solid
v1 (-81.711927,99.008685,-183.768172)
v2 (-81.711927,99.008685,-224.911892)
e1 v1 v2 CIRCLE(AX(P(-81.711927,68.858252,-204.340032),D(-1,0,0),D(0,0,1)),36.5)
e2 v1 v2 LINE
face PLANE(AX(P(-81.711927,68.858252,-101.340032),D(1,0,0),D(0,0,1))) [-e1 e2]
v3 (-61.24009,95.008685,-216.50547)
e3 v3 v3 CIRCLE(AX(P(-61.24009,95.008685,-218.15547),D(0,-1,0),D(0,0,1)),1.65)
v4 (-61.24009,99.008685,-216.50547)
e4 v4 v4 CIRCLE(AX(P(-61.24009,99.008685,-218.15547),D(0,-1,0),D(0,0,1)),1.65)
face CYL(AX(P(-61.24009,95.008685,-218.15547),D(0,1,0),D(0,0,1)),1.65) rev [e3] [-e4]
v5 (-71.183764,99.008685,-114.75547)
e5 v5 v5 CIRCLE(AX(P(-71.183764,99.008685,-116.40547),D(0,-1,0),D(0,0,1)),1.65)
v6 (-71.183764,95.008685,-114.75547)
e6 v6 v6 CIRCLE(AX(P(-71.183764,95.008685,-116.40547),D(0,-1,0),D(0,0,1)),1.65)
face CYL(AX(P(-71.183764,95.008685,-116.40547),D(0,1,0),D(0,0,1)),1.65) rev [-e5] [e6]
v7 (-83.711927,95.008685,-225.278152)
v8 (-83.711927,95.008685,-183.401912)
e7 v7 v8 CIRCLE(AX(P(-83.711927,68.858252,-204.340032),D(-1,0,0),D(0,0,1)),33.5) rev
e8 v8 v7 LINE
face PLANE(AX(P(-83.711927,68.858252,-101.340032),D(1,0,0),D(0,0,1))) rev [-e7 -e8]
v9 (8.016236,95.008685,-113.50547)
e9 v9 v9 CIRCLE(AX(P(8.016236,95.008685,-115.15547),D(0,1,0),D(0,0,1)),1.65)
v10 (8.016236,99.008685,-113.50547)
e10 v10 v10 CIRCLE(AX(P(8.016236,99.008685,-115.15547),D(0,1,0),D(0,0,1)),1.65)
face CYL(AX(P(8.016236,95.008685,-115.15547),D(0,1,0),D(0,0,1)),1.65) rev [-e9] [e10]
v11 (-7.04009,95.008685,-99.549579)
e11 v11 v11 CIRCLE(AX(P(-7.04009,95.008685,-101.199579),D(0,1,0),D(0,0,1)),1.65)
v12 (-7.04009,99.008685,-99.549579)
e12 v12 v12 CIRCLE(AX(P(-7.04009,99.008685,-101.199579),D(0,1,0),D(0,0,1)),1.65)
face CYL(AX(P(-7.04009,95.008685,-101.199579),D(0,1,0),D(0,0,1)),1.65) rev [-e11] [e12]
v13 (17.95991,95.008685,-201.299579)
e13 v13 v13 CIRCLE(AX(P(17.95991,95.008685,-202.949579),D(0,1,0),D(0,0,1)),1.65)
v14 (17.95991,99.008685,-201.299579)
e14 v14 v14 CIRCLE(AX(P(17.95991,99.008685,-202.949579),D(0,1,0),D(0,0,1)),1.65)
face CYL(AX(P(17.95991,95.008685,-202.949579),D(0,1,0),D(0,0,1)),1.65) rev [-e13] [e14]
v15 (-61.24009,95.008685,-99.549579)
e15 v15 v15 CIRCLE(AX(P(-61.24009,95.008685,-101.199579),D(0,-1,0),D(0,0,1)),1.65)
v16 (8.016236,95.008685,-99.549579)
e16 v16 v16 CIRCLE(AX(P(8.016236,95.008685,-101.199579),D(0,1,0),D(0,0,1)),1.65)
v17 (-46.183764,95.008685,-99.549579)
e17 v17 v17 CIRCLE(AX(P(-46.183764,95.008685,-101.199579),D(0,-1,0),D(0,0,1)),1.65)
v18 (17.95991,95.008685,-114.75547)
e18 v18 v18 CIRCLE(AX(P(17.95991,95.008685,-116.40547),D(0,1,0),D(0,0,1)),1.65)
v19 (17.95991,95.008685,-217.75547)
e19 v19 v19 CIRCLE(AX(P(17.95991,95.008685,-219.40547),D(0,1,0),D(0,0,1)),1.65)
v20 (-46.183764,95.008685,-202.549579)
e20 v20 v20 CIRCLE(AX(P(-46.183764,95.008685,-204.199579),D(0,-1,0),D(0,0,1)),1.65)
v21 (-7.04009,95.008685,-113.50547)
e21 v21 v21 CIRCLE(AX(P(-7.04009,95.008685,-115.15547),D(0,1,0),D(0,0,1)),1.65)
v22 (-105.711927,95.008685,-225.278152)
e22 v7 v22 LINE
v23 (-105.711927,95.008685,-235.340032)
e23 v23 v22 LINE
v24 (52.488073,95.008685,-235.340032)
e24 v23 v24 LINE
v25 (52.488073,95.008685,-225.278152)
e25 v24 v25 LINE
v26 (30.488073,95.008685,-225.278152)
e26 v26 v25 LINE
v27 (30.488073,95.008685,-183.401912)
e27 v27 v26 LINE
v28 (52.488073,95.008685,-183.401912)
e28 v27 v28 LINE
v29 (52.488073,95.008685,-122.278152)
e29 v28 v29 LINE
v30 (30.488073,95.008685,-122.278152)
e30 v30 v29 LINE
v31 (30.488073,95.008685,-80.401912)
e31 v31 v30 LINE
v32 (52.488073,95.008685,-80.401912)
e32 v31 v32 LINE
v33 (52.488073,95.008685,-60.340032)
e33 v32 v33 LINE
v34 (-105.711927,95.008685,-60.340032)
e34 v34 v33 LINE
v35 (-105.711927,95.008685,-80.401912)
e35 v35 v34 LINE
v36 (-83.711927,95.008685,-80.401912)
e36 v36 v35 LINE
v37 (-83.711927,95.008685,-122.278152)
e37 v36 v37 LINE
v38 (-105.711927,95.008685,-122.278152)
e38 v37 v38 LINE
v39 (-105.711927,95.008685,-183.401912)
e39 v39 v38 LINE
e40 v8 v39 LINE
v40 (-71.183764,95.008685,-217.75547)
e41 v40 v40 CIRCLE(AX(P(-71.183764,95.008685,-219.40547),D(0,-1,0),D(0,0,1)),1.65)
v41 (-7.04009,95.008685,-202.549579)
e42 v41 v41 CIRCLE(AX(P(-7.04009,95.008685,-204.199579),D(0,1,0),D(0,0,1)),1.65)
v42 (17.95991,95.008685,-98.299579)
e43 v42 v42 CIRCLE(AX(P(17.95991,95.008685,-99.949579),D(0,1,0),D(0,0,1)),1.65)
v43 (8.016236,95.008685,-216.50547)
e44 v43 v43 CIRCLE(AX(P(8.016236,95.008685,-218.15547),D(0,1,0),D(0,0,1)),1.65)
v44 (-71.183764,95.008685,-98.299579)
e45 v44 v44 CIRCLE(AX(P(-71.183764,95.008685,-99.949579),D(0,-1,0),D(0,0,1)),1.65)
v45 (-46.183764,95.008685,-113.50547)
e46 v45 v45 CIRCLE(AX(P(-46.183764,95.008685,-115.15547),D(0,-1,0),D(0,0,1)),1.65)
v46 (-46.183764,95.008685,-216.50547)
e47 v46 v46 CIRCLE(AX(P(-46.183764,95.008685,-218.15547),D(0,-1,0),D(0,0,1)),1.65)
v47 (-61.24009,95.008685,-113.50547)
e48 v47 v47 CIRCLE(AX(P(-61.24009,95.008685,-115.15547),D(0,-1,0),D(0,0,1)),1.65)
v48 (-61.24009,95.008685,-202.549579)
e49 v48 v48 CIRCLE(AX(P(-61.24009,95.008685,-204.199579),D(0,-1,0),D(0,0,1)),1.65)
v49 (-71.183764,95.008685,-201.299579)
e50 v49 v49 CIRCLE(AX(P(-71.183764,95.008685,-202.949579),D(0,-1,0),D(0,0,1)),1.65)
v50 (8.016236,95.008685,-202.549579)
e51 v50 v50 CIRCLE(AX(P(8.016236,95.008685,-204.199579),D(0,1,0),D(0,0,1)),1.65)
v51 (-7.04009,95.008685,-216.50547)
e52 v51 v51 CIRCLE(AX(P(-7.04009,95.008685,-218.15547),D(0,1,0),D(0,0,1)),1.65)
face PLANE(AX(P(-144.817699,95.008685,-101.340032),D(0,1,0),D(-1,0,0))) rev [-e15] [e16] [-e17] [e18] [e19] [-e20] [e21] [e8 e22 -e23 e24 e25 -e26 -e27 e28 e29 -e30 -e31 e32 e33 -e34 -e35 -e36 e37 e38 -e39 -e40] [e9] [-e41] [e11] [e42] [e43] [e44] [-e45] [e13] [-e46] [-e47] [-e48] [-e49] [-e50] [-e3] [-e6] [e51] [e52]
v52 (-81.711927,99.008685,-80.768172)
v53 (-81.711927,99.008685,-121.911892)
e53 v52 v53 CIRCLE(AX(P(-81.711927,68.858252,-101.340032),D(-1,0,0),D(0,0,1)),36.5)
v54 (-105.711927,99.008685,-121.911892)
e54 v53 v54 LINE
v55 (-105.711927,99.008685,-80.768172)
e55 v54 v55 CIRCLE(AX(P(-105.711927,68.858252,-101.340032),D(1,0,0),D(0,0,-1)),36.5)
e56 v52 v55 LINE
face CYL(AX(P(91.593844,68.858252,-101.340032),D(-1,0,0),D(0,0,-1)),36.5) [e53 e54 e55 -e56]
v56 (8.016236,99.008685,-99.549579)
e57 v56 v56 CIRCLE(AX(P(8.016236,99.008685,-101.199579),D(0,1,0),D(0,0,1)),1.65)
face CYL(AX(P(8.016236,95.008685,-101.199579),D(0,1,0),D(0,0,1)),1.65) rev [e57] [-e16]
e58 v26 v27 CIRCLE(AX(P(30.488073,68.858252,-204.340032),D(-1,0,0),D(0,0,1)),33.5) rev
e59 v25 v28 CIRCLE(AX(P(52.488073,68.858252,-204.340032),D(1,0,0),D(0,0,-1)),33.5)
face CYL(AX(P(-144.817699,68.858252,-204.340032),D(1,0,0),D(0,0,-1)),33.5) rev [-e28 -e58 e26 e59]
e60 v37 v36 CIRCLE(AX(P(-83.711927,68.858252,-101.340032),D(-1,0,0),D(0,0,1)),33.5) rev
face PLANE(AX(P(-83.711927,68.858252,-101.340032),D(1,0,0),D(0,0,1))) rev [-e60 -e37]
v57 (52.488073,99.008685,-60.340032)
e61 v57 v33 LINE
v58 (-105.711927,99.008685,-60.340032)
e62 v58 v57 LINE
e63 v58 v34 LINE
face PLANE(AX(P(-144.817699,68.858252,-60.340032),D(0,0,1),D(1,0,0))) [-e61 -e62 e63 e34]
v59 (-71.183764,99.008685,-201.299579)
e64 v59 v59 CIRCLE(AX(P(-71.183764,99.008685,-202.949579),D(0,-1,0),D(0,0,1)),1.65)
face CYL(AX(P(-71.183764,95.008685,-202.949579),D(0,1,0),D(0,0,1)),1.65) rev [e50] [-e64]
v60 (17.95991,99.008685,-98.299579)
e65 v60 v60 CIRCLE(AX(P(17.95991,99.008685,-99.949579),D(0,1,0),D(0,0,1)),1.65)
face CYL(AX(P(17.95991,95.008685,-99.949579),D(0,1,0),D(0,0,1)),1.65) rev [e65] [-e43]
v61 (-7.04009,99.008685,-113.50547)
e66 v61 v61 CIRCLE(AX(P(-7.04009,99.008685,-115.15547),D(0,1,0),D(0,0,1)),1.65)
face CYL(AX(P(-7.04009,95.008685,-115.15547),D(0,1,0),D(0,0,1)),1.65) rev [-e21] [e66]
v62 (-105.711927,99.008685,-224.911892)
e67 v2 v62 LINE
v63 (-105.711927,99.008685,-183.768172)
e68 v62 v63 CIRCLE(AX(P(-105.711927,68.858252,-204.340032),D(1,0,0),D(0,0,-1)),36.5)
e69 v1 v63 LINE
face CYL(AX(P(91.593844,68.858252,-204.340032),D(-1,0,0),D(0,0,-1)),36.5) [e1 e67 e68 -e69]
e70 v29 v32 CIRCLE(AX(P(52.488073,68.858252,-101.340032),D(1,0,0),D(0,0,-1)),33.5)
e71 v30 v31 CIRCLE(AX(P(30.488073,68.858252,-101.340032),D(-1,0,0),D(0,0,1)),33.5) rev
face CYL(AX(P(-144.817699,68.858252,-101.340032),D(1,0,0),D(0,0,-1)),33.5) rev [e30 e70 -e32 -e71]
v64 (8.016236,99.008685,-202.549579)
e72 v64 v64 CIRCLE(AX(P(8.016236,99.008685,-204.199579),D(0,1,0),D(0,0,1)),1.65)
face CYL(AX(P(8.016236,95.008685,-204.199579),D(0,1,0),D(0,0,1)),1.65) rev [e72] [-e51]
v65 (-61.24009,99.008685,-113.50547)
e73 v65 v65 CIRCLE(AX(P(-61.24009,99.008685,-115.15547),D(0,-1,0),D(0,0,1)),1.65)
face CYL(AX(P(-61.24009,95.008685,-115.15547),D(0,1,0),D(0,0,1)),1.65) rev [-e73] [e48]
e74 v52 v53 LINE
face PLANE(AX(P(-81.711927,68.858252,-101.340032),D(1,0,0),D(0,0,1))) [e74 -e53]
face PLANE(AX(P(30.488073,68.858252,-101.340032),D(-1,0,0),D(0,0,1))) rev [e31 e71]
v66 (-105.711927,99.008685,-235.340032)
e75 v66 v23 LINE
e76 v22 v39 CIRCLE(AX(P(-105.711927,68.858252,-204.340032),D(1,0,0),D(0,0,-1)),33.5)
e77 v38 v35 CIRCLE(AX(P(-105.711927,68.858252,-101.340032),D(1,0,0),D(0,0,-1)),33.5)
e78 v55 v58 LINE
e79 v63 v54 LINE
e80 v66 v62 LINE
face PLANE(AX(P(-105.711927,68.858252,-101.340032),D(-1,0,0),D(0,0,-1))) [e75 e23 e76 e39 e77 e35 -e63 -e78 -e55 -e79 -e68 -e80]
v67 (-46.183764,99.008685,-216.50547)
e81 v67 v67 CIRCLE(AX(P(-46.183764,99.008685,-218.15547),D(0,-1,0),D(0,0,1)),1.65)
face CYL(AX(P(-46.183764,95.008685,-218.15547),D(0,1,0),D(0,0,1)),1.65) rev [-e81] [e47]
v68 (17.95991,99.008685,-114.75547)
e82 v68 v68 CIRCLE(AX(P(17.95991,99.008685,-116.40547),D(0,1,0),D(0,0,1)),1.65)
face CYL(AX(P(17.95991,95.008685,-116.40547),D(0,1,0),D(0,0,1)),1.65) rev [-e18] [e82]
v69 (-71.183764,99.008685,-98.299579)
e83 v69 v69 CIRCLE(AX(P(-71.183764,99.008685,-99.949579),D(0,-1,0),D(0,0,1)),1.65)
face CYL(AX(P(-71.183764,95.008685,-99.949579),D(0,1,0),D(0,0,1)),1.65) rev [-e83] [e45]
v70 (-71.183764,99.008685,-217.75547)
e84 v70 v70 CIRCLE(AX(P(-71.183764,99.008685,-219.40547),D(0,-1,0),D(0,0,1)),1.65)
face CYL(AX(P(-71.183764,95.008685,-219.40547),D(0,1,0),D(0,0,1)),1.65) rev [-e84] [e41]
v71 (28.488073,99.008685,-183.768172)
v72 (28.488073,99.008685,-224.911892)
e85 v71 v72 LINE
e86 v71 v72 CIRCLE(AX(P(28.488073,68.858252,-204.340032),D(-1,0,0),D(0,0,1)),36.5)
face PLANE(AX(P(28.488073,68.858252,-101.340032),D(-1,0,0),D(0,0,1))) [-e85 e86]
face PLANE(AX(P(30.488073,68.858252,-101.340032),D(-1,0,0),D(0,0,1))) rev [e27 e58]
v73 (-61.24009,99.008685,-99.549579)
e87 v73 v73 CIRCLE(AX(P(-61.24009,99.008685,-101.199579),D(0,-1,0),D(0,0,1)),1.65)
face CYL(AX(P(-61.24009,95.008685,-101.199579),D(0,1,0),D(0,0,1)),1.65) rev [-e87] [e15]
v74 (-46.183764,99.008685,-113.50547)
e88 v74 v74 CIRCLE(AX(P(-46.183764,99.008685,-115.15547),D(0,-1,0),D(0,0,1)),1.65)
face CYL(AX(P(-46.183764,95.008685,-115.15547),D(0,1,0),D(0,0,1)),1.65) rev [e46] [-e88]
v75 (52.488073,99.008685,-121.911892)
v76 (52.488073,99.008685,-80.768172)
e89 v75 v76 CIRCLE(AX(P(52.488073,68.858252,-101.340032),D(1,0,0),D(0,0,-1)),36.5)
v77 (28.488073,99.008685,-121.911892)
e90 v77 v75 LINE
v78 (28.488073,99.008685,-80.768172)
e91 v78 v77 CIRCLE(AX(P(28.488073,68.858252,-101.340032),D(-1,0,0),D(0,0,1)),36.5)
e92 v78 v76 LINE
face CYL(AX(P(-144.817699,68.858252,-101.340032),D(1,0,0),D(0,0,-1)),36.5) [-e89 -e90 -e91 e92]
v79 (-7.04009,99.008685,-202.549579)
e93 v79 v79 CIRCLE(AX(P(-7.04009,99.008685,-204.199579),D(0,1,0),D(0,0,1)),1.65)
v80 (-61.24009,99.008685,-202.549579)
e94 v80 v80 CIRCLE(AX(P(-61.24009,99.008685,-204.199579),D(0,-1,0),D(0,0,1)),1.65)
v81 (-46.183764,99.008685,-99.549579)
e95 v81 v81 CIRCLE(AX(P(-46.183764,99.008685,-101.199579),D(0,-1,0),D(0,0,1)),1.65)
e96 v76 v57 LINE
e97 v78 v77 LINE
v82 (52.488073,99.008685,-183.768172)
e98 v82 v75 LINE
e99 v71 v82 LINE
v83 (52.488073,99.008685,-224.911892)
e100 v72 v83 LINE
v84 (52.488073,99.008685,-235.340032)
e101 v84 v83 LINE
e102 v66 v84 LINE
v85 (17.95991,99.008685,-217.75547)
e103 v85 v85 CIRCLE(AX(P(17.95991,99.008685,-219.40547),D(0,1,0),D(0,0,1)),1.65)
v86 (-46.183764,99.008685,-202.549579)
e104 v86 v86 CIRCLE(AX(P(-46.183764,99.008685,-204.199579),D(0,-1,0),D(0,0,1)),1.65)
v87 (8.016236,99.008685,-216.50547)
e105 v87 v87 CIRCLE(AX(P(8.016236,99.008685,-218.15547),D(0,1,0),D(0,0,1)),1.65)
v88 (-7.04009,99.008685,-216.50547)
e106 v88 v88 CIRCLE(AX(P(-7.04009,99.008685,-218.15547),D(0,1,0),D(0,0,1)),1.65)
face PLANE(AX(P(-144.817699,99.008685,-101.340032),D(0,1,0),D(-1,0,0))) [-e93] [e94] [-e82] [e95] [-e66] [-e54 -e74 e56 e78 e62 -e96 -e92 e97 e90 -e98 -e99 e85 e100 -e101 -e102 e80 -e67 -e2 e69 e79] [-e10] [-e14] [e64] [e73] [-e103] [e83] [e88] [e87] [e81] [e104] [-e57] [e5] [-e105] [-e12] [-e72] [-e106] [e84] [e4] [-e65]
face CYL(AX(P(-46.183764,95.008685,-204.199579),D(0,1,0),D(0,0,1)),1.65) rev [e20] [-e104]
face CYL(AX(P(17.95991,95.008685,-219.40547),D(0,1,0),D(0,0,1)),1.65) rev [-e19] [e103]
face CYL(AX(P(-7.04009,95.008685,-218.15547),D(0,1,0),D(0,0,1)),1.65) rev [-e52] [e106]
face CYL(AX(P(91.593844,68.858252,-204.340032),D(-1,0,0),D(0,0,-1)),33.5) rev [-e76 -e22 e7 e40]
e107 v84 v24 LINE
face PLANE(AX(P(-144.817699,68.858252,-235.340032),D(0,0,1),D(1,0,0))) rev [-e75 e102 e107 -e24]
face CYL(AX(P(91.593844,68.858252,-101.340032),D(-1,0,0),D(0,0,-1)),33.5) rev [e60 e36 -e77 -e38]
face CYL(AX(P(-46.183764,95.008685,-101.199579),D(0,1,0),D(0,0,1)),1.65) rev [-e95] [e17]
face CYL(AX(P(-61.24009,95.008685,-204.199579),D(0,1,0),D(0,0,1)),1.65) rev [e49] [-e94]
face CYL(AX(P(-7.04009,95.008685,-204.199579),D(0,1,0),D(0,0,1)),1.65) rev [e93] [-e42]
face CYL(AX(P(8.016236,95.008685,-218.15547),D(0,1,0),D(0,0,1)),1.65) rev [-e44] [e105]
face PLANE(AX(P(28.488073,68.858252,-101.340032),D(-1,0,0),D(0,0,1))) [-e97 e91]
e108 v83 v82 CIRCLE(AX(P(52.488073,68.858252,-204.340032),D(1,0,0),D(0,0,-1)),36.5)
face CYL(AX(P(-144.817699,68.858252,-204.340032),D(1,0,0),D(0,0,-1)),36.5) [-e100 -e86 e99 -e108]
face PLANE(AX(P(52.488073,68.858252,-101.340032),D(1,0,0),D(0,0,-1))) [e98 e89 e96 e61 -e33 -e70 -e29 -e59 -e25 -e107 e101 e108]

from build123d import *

# Parameters (mm, degrees)
BOSS_EXTRUDE1_START = 26.668379
BOSS_EXTRUDE1_DEPTH = 22
BOSS_EXTRUDE2_START = 24.668379
BOSS_EXTRUDE2_DEPTH = 2
BOSS_EXTRUDE3_START = -30.431621
BOSS_EXTRUDE3_DEPTH = 55.1
SKETCH3_R           = 1.65
CUT_EXTRUDE3_DEPTH  = 242.205815579
MIRROR5_START       = 95.008684799
MIRROR5_OUTLINE_R   = 1.65
MIRROR5_DEPTH       = 10.349567393
MIRROR5_START_2     = -81.71192711
MIRROR5_2_OUTLINE_W = 6.349567393
MIRROR5_2_OUTLINE_H = 175.000000001
MIRROR5_2_DEPTH     = 55.1
MIRROR5_START_3     = -105.71192711
MIRROR5_3_DEPTH     = 22
MIRROR5_START_4     = -83.71192711
MIRROR5_4_DEPTH     = 2


with BuildPart() as part:
    # Sketch1 → Boss-Extrude1 (new body)
    with BuildSketch(Plane(origin=(3.819694134, 12.849567393, 0), x_dir=(2.970776402655419e-12, 0, -1.0), z_dir=(1.0, 0, 2.970776402655419e-12)).offset(BOSS_EXTRUDE1_START)):
        with BuildLine():
            Line((60.340031958, 86.159117405), (60.340031958, 82.159117405))
            Line((60.340031958, 82.159117405), (75.876236591, 82.159117405))
            ThreePointArc((75.876236591, 82.159117405), (78.235478607, 84.265181653), (80.768172206, 86.159117405))
            Line((80.768172206, 86.159117405), (60.340031958, 86.159117405))
        make_face()
        with BuildLine():
            ThreePointArc((80.768172206, 86.159117405), (78.235478607, 84.265181653), (75.876236591, 82.159117405))
            Line((75.876236591, 82.159117405), (80.40191183, 82.159117405))
            ThreePointArc((80.40191183, 82.159117405), (83.458066287, 84.336856356), (86.738613751, 86.159117405))
            Line((86.738613751, 86.159117405), (80.768172206, 86.159117405))
        make_face()
        with BuildLine():
            ThreePointArc((115.941450164, 86.159117405), (119.221997628, 84.336856356), (122.278152085, 82.159117405))
            Line((122.278152085, 82.159117405), (126.803827325, 82.159117405))
            ThreePointArc((126.803827325, 82.159117405), (124.444585309, 84.265181653), (121.911891709, 86.159117405))
            Line((121.911891709, 86.159117405), (115.941450164, 86.159117405))
        make_face()
        with BuildLine():
            ThreePointArc((121.911891709, 86.159117405), (101.340031958, 92.508684799), (80.768172206, 86.159117405))
            Line((80.768172206, 86.159117405), (86.738613751, 86.159117405))
            ThreePointArc((86.738613751, 86.159117405), (101.340031958, 89.508684799), (115.941450164, 86.159117405))
            Line((115.941450164, 86.159117405), (121.911891709, 86.159117405))
        make_face()
        with BuildLine():
            Line((183.768172206, 86.159117405), (121.911891709, 86.159117405))
            ThreePointArc((121.911891709, 86.159117405), (124.444585309, 84.265181653), (126.803827325, 82.159117405))
            Line((126.803827325, 82.159117405), (178.876236591, 82.159117405))
            ThreePointArc((178.876236591, 82.159117405), (181.235478607, 84.265181653), (183.768172206, 86.159117405))
        make_face()
        with BuildLine():
            Line((189.738613751, 86.159117405), (183.768172206, 86.159117405))
            ThreePointArc((183.768172206, 86.159117405), (181.235478607, 84.265181653), (178.876236591, 82.159117405))
            Line((178.876236591, 82.159117405), (183.40191183, 82.159117405))
            ThreePointArc((183.40191183, 82.159117405), (186.458066287, 84.336856356), (189.738613751, 86.159117405))
        make_face()
        with BuildLine():
            ThreePointArc((229.803827325, 82.159117405), (227.444585309, 84.265181653), (224.911891709, 86.159117405))
            Line((224.911891709, 86.159117405), (218.941450164, 86.159117405))
            ThreePointArc((218.941450164, 86.159117405), (222.221997628, 84.336856356), (225.278152085, 82.159117405))
            Line((225.278152085, 82.159117405), (229.803827325, 82.159117405))
        make_face()
        with BuildLine():
            ThreePointArc((224.911891709, 86.159117405), (204.340031958, 92.508684799), (183.768172206, 86.159117405))
            Line((183.768172206, 86.159117405), (189.738613751, 86.159117405))
            ThreePointArc((189.738613751, 86.159117405), (204.340031958, 89.508684799), (218.941450164, 86.159117405))
            Line((218.941450164, 86.159117405), (224.911891709, 86.159117405))
        make_face()
        with BuildLine():
            Line((235.340031958, 86.159117405), (224.911891709, 86.159117405))
            ThreePointArc((224.911891709, 86.159117405), (227.444585309, 84.265181653), (229.803827325, 82.159117405))
            Line((229.803827325, 82.159117405), (235.340031958, 82.159117405))
            Line((235.340031958, 82.159117405), (235.340031958, 86.159117405))
        make_face()
    extrude(amount=BOSS_EXTRUDE1_DEPTH)

    # Sketch1<7> → Boss-Extrude2 (add)
    with BuildSketch(Plane(origin=(3.819694134, 12.849567393, 0), x_dir=(2.970776402655419e-12, 0, -1.0), z_dir=(1.0, 0, 2.970776402655419e-12)).offset(BOSS_EXTRUDE2_START)):
        with BuildLine():
            ThreePointArc((121.911891709, 86.159117405), (101.340031958, 92.508684799), (80.768172206, 86.159117405))
            Line((80.768172206, 86.159117405), (86.738613751, 86.159117405))
            ThreePointArc((86.738613751, 86.159117405), (101.340031958, 89.508684799), (115.941450164, 86.159117405))
            Line((115.941450164, 86.159117405), (121.911891709, 86.159117405))
        make_face()
        with BuildLine():
            ThreePointArc((80.768172206, 86.159117405), (78.235478607, 84.265181653), (75.876236591, 82.159117405))
            Line((75.876236591, 82.159117405), (80.40191183, 82.159117405))
            ThreePointArc((80.40191183, 82.159117405), (83.458066287, 84.336856356), (86.738613751, 86.159117405))
            Line((86.738613751, 86.159117405), (80.768172206, 86.159117405))
        make_face()
        with BuildLine():
            ThreePointArc((115.941450164, 86.159117405), (119.221997628, 84.336856356), (122.278152085, 82.159117405))
            Line((122.278152085, 82.159117405), (126.803827325, 82.159117405))
            ThreePointArc((126.803827325, 82.159117405), (124.444585309, 84.265181653), (121.911891709, 86.159117405))
            Line((121.911891709, 86.159117405), (115.941450164, 86.159117405))
        make_face()
        with BuildLine():
            Line((60.340031958, 86.159117405), (60.340031958, 82.159117405))
            Line((60.340031958, 82.159117405), (75.876236591, 82.159117405))
            ThreePointArc((75.876236591, 82.159117405), (78.235478607, 84.265181653), (80.768172206, 86.159117405))
            Line((80.768172206, 86.159117405), (60.340031958, 86.159117405))
        make_face()
        with BuildLine():
            ThreePointArc((86.738613751, 86.159117405), (83.458066287, 84.336856356), (80.40191183, 82.159117405))
            Line((80.40191183, 82.159117405), (122.278152085, 82.159117405))
            ThreePointArc((122.278152085, 82.159117405), (119.221997628, 84.336856356), (115.941450164, 86.159117405))
            Line((115.941450164, 86.159117405), (86.738613751, 86.159117405))
        make_face()
        with BuildLine():
            ThreePointArc((115.941450164, 86.159117405), (101.340031958, 89.508684799), (86.738613751, 86.159117405))
            Line((86.738613751, 86.159117405), (115.941450164, 86.159117405))
        make_face()
        with BuildLine():
            Line((183.768172206, 86.159117405), (121.911891709, 86.159117405))
            ThreePointArc((121.911891709, 86.159117405), (124.444585309, 84.265181653), (126.803827325, 82.159117405))
            Line((126.803827325, 82.159117405), (178.876236591, 82.159117405))
            ThreePointArc((178.876236591, 82.159117405), (181.235478607, 84.265181653), (183.768172206, 86.159117405))
        make_face()
        with BuildLine():
            Line((189.738613751, 86.159117405), (183.768172206, 86.159117405))
            ThreePointArc((183.768172206, 86.159117405), (181.235478607, 84.265181653), (178.876236591, 82.159117405))
            Line((178.876236591, 82.159117405), (183.40191183, 82.159117405))
            ThreePointArc((183.40191183, 82.159117405), (186.458066287, 84.336856356), (189.738613751, 86.159117405))
        make_face()
        with BuildLine():
            ThreePointArc((229.803827325, 82.159117405), (227.444585309, 84.265181653), (224.911891709, 86.159117405))
            Line((224.911891709, 86.159117405), (218.941450164, 86.159117405))
            ThreePointArc((218.941450164, 86.159117405), (222.221997628, 84.336856356), (225.278152085, 82.159117405))
            Line((225.278152085, 82.159117405), (229.803827325, 82.159117405))
        make_face()
        with BuildLine():
            ThreePointArc((224.911891709, 86.159117405), (204.340031958, 92.508684799), (183.768172206, 86.159117405))
            Line((183.768172206, 86.159117405), (189.738613751, 86.159117405))
            ThreePointArc((189.738613751, 86.159117405), (204.340031958, 89.508684799), (218.941450164, 86.159117405))
            Line((218.941450164, 86.159117405), (224.911891709, 86.159117405))
        make_face()
        with BuildLine():
            ThreePointArc((218.941450164, 86.159117405), (204.340031958, 89.508684799), (189.738613751, 86.159117405))
            Line((189.738613751, 86.159117405), (218.941450164, 86.159117405))
        make_face()
        with BuildLine():
            Line((218.941450164, 86.159117405), (189.738613751, 86.159117405))
            ThreePointArc((189.738613751, 86.159117405), (186.458066287, 84.336856356), (183.40191183, 82.159117405))
            Line((183.40191183, 82.159117405), (225.278152085, 82.159117405))
            ThreePointArc((225.278152085, 82.159117405), (222.221997628, 84.336856356), (218.941450164, 86.159117405))
        make_face()
        with BuildLine():
            Line((235.340031958, 86.159117405), (224.911891709, 86.159117405))
            ThreePointArc((224.911891709, 86.159117405), (227.444585309, 84.265181653), (229.803827325, 82.159117405))
            Line((229.803827325, 82.159117405), (235.340031958, 82.159117405))
            Line((235.340031958, 82.159117405), (235.340031958, 86.159117405))
        make_face()
    extrude(amount=BOSS_EXTRUDE2_DEPTH)

    # Sketch1<12> → Boss-Extrude3 (add)
    with BuildSketch(Plane(origin=(3.819694134, 12.849567393, 0), x_dir=(2.970776402655419e-12, 0, -1.0), z_dir=(1.0, 0, 2.970776402655419e-12)).offset(BOSS_EXTRUDE3_START)):
        with BuildLine():
            Line((235.340031958, 86.159117405), (224.911891709, 86.159117405))
            ThreePointArc((224.911891709, 86.159117405), (227.444585309, 84.265181653), (229.803827325, 82.159117405))
            Line((229.803827325, 82.159117405), (235.340031958, 82.159117405))
            Line((235.340031958, 82.159117405), (235.340031958, 86.159117405))
        make_face()
        with BuildLine():
            Line((189.738613751, 86.159117405), (183.768172206, 86.159117405))
            ThreePointArc((183.768172206, 86.159117405), (181.235478607, 84.265181653), (178.876236591, 82.159117405))
            Line((178.876236591, 82.159117405), (183.40191183, 82.159117405))
            ThreePointArc((183.40191183, 82.159117405), (186.458066287, 84.336856356), (189.738613751, 86.159117405))
        make_face()
        with BuildLine():
            ThreePointArc((229.803827325, 82.159117405), (227.444585309, 84.265181653), (224.911891709, 86.159117405))
            Line((224.911891709, 86.159117405), (218.941450164, 86.159117405))
            ThreePointArc((218.941450164, 86.159117405), (222.221997628, 84.336856356), (225.278152085, 82.159117405))
            Line((225.278152085, 82.159117405), (229.803827325, 82.159117405))
        make_face()
        with BuildLine():
            Line((218.941450164, 86.159117405), (189.738613751, 86.159117405))
            ThreePointArc((189.738613751, 86.159117405), (186.458066287, 84.336856356), (183.40191183, 82.159117405))
            Line((183.40191183, 82.159117405), (225.278152085, 82.159117405))
            ThreePointArc((225.278152085, 82.159117405), (222.221997628, 84.336856356), (218.941450164, 86.159117405))
        make_face()
        with BuildLine():
            Line((183.768172206, 86.159117405), (121.911891709, 86.159117405))
            ThreePointArc((121.911891709, 86.159117405), (124.444585309, 84.265181653), (126.803827325, 82.159117405))
            Line((126.803827325, 82.159117405), (178.876236591, 82.159117405))
            ThreePointArc((178.876236591, 82.159117405), (181.235478607, 84.265181653), (183.768172206, 86.159117405))
        make_face()
        with BuildLine():
            ThreePointArc((80.768172206, 86.159117405), (78.235478607, 84.265181653), (75.876236591, 82.159117405))
            Line((75.876236591, 82.159117405), (80.40191183, 82.159117405))
            ThreePointArc((80.40191183, 82.159117405), (83.458066287, 84.336856356), (86.738613751, 86.159117405))
            Line((86.738613751, 86.159117405), (80.768172206, 86.159117405))
        make_face()
        with BuildLine():
            ThreePointArc((115.941450164, 86.159117405), (119.221997628, 84.336856356), (122.278152085, 82.159117405))
            Line((122.278152085, 82.159117405), (126.803827325, 82.159117405))
            ThreePointArc((126.803827325, 82.159117405), (124.444585309, 84.265181653), (121.911891709, 86.159117405))
            Line((121.911891709, 86.159117405), (115.941450164, 86.159117405))
        make_face()
        with BuildLine():
            ThreePointArc((86.738613751, 86.159117405), (83.458066287, 84.336856356), (80.40191183, 82.159117405))
            Line((80.40191183, 82.159117405), (122.278152085, 82.159117405))
            ThreePointArc((122.278152085, 82.159117405), (119.221997628, 84.336856356), (115.941450164, 86.159117405))
            Line((115.941450164, 86.159117405), (86.738613751, 86.159117405))
        make_face()
        with BuildLine():
            Line((60.340031958, 86.159117405), (60.340031958, 82.159117405))
            Line((60.340031958, 82.159117405), (75.876236591, 82.159117405))
            ThreePointArc((75.876236591, 82.159117405), (78.235478607, 84.265181653), (80.768172206, 86.159117405))
            Line((80.768172206, 86.159117405), (60.340031958, 86.159117405))
        make_face()
    extrude(amount=BOSS_EXTRUDE3_DEPTH)

    # Sketch3 → Cut-Extrude3 (cut, through all)
    with BuildSketch(Plane(origin=(0, 99.008684799, 0), x_dir=(1.0, 0, -7.801794756506578e-11), z_dir=(0, 1, 0))):
        with Locations(Location((17.95990954, 99.949578522, 0), (0, 0, 269.999999996))):
            Circle(SKETCH3_R)
        with Locations(Location((8.016236256, 101.199578523, 0), (0, 0, 269.999999996))):
            Circle(SKETCH3_R)
        with Locations(Location((-7.04009046, 101.199578524, 0), (0, 0, 269.999999996))):
            Circle(SKETCH3_R)
        with Locations(Location((-7.040090459, 115.155469507, 0), (0, 0, 269.999999996))):
            Circle(SKETCH3_R)
        with Locations(Location((8.016236257, 115.155469505, 0), (0, 0, 269.999999996))):
            Circle(SKETCH3_R)
        with Locations(Location((17.959909542, 116.405469505, 0), (0, 0, 269.999999996))):
            Circle(SKETCH3_R)
        with Locations(Location((17.95990954, 202.949578525, 0), (0, 0, 269.999999996))):
            Circle(SKETCH3_R)
        with Locations(Location((8.016236256, 204.199578526, 0), (0, 0, 269.999999996))):
            Circle(SKETCH3_R)
        with Locations(Location((-7.04009046, 204.199578528, 0), (0, 0, 269.999999996))):
            Circle(SKETCH3_R)
        with Locations(Location((-7.040090459, 218.15546951, 0), (0, 0, 269.999999996))):
            Circle(SKETCH3_R)
        with Locations(Location((8.016236257, 218.155469509, 0), (0, 0, 269.999999996))):
            Circle(SKETCH3_R)
        with Locations(Location((17.959909542, 219.405469508, 0), (0, 0, 269.999999996))):
            Circle(SKETCH3_R)
    extrude(amount=-CUT_EXTRUDE3_DEPTH, mode=Mode.SUBTRACT)

    # Mirror5: read off the stored shape, not the designer's step
    # Mirror5 outline → Mirror5 (add)
    with BuildSketch(Plane(origin=(0, 0, 0), x_dir=(1, 0, 0), z_dir=(0, 1, 0)).offset(MIRROR5_START)):
        Polygon((-105.711927111, 235.340031957), (-105.71192711, 60.340031957), (-26.61192711, 60.340031957), (-26.61192711, 235.340031958), align=None)
        with Locations((-71.183763752, 99.949578523)):
            Circle(MIRROR5_OUTLINE_R, mode=Mode.SUBTRACT)
        with Locations((-71.183763752, 116.405469506)):
            Circle(MIRROR5_OUTLINE_R, mode=Mode.SUBTRACT)
        with Locations((-61.240090468, 101.199578523)):
            Circle(MIRROR5_OUTLINE_R, mode=Mode.SUBTRACT)
        with Locations((-46.183763752, 101.199578523)):
            Circle(MIRROR5_OUTLINE_R, mode=Mode.SUBTRACT)
        with Locations((-61.240090468, 115.155469506)):
            Circle(MIRROR5_OUTLINE_R, mode=Mode.SUBTRACT)
        with Locations((-46.183763752, 115.155469506)):
            Circle(MIRROR5_OUTLINE_R, mode=Mode.SUBTRACT)
        with Locations((-71.183763744, 202.949578527)):
            Circle(MIRROR5_OUTLINE_R, mode=Mode.SUBTRACT)
        with Locations((-71.183763744, 219.40546951)):
            Circle(MIRROR5_OUTLINE_R, mode=Mode.SUBTRACT)
        with Locations((-61.24009046, 204.199578527)):
            Circle(MIRROR5_OUTLINE_R, mode=Mode.SUBTRACT)
        with Locations((-61.24009046, 218.15546951)):
            Circle(MIRROR5_OUTLINE_R, mode=Mode.SUBTRACT)
        with Locations((-46.183763744, 204.199578527)):
            Circle(MIRROR5_OUTLINE_R, mode=Mode.SUBTRACT)
        with Locations((-46.183763744, 218.15546951)):
            Circle(MIRROR5_OUTLINE_R, mode=Mode.SUBTRACT)
    extrude(amount=MIRROR5_DEPTH)

    # Mirror5 2 outline → Mirror5 2 (cut)
    with BuildSketch(Plane.YZ.offset(MIRROR5_START_2)):
        with Locations((102.183468496, -147.840031958)):
            Rectangle(MIRROR5_2_OUTLINE_W, MIRROR5_2_OUTLINE_H)
    extrude(amount=MIRROR5_2_DEPTH, mode=Mode.SUBTRACT)

    # Mirror5 3 outline → Mirror5 3 (cut)
    with BuildSketch(Plane.YZ.offset(MIRROR5_START_3)):
        with BuildLine():
            Line((99.008684799, -224.911891709), (99.008684799, -235.340031957))
            Line((99.008684799, -235.340031957), (105.358252192, -235.340031958))
            Line((105.358252192, -235.340031958), (105.358252192, -204.340031958))
            ThreePointArc((105.358252192, -204.340031958), (103.73475424, -215.10477092), (99.008684799, -224.911891709))
        make_face()
        with BuildLine():
            ThreePointArc((95.008684799, -225.278152085), (102.358252192, -204.340031958), (95.008684799, -183.40191183))
            Line((95.008684799, -183.40191183), (95.008684799, -225.278152085))
        make_face()
        with BuildLine():
            ThreePointArc((99.008684799, -183.768172206), (103.73475424, -193.575292995), (105.358252192, -204.340031958))
            Line((105.358252192, -204.340031958), (105.358252192, -101.340031957))
            ThreePointArc((105.358252192, -101.340031957), (103.73475424, -112.10477092), (99.008684799, -121.911891709))
            Line((99.008684799, -121.911891709), (99.008684799, -183.768172206))
        make_face()
        with BuildLine():
            ThreePointArc((99.008684799, -80.768172206), (103.73475424, -90.575292995), (105.358252192, -101.340031957))
            Line((105.358252192, -101.340031957), (105.358252192, -60.340031957))
            Line((105.358252192, -60.340031957), (99.008684799, -60.340031957))
            Line((99.008684799, -60.340031957), (99.008684799, -80.768172206))
        make_face()
        with BuildLine():
            Line((95.008684799, -80.40191183), (95.008684799, -122.278152085))
            ThreePointArc((95.008684799, -122.278152085), (102.358252192, -101.340031958), (95.008684799, -80.40191183))
        make_face()
    extrude(amount=MIRROR5_3_DEPTH, mode=Mode.SUBTRACT)

    # Mirror5 4 outline → Mirror5 4 (cut)
    with BuildSketch(Plane.YZ.offset(MIRROR5_START_4)):
        with BuildLine():
            Line((99.008684799, -224.911891709), (99.008684799, -235.340031957))
            Line((99.008684799, -235.340031957), (105.358252192, -235.340031958))
            Line((105.358252192, -235.340031958), (105.358252192, -204.340031958))
            ThreePointArc((105.358252192, -204.340031958), (103.73475424, -215.10477092), (99.008684799, -224.911891709))
        make_face()
        with BuildLine():
            ThreePointArc((99.008684799, -183.768172206), (103.73475424, -193.575292995), (105.358252192, -204.340031958))
            Line((105.358252192, -204.340031958), (105.358252192, -101.340031957))
            ThreePointArc((105.358252192, -101.340031957), (103.73475424, -112.10477092), (99.008684799, -121.911891709))
            Line((99.008684799, -121.911891709), (99.008684799, -183.768172206))
        make_face()
        with BuildLine():
            ThreePointArc((99.008684799, -80.768172206), (103.73475424, -90.575292995), (105.358252192, -101.340031957))
            Line((105.358252192, -101.340031957), (105.358252192, -60.340031957))
            Line((105.358252192, -60.340031957), (99.008684799, -60.340031957))
            Line((99.008684799, -60.340031957), (99.008684799, -80.768172206))
        make_face()
    extrude(amount=MIRROR5_4_DEPTH, mode=Mode.SUBTRACT)


solid = part.part
